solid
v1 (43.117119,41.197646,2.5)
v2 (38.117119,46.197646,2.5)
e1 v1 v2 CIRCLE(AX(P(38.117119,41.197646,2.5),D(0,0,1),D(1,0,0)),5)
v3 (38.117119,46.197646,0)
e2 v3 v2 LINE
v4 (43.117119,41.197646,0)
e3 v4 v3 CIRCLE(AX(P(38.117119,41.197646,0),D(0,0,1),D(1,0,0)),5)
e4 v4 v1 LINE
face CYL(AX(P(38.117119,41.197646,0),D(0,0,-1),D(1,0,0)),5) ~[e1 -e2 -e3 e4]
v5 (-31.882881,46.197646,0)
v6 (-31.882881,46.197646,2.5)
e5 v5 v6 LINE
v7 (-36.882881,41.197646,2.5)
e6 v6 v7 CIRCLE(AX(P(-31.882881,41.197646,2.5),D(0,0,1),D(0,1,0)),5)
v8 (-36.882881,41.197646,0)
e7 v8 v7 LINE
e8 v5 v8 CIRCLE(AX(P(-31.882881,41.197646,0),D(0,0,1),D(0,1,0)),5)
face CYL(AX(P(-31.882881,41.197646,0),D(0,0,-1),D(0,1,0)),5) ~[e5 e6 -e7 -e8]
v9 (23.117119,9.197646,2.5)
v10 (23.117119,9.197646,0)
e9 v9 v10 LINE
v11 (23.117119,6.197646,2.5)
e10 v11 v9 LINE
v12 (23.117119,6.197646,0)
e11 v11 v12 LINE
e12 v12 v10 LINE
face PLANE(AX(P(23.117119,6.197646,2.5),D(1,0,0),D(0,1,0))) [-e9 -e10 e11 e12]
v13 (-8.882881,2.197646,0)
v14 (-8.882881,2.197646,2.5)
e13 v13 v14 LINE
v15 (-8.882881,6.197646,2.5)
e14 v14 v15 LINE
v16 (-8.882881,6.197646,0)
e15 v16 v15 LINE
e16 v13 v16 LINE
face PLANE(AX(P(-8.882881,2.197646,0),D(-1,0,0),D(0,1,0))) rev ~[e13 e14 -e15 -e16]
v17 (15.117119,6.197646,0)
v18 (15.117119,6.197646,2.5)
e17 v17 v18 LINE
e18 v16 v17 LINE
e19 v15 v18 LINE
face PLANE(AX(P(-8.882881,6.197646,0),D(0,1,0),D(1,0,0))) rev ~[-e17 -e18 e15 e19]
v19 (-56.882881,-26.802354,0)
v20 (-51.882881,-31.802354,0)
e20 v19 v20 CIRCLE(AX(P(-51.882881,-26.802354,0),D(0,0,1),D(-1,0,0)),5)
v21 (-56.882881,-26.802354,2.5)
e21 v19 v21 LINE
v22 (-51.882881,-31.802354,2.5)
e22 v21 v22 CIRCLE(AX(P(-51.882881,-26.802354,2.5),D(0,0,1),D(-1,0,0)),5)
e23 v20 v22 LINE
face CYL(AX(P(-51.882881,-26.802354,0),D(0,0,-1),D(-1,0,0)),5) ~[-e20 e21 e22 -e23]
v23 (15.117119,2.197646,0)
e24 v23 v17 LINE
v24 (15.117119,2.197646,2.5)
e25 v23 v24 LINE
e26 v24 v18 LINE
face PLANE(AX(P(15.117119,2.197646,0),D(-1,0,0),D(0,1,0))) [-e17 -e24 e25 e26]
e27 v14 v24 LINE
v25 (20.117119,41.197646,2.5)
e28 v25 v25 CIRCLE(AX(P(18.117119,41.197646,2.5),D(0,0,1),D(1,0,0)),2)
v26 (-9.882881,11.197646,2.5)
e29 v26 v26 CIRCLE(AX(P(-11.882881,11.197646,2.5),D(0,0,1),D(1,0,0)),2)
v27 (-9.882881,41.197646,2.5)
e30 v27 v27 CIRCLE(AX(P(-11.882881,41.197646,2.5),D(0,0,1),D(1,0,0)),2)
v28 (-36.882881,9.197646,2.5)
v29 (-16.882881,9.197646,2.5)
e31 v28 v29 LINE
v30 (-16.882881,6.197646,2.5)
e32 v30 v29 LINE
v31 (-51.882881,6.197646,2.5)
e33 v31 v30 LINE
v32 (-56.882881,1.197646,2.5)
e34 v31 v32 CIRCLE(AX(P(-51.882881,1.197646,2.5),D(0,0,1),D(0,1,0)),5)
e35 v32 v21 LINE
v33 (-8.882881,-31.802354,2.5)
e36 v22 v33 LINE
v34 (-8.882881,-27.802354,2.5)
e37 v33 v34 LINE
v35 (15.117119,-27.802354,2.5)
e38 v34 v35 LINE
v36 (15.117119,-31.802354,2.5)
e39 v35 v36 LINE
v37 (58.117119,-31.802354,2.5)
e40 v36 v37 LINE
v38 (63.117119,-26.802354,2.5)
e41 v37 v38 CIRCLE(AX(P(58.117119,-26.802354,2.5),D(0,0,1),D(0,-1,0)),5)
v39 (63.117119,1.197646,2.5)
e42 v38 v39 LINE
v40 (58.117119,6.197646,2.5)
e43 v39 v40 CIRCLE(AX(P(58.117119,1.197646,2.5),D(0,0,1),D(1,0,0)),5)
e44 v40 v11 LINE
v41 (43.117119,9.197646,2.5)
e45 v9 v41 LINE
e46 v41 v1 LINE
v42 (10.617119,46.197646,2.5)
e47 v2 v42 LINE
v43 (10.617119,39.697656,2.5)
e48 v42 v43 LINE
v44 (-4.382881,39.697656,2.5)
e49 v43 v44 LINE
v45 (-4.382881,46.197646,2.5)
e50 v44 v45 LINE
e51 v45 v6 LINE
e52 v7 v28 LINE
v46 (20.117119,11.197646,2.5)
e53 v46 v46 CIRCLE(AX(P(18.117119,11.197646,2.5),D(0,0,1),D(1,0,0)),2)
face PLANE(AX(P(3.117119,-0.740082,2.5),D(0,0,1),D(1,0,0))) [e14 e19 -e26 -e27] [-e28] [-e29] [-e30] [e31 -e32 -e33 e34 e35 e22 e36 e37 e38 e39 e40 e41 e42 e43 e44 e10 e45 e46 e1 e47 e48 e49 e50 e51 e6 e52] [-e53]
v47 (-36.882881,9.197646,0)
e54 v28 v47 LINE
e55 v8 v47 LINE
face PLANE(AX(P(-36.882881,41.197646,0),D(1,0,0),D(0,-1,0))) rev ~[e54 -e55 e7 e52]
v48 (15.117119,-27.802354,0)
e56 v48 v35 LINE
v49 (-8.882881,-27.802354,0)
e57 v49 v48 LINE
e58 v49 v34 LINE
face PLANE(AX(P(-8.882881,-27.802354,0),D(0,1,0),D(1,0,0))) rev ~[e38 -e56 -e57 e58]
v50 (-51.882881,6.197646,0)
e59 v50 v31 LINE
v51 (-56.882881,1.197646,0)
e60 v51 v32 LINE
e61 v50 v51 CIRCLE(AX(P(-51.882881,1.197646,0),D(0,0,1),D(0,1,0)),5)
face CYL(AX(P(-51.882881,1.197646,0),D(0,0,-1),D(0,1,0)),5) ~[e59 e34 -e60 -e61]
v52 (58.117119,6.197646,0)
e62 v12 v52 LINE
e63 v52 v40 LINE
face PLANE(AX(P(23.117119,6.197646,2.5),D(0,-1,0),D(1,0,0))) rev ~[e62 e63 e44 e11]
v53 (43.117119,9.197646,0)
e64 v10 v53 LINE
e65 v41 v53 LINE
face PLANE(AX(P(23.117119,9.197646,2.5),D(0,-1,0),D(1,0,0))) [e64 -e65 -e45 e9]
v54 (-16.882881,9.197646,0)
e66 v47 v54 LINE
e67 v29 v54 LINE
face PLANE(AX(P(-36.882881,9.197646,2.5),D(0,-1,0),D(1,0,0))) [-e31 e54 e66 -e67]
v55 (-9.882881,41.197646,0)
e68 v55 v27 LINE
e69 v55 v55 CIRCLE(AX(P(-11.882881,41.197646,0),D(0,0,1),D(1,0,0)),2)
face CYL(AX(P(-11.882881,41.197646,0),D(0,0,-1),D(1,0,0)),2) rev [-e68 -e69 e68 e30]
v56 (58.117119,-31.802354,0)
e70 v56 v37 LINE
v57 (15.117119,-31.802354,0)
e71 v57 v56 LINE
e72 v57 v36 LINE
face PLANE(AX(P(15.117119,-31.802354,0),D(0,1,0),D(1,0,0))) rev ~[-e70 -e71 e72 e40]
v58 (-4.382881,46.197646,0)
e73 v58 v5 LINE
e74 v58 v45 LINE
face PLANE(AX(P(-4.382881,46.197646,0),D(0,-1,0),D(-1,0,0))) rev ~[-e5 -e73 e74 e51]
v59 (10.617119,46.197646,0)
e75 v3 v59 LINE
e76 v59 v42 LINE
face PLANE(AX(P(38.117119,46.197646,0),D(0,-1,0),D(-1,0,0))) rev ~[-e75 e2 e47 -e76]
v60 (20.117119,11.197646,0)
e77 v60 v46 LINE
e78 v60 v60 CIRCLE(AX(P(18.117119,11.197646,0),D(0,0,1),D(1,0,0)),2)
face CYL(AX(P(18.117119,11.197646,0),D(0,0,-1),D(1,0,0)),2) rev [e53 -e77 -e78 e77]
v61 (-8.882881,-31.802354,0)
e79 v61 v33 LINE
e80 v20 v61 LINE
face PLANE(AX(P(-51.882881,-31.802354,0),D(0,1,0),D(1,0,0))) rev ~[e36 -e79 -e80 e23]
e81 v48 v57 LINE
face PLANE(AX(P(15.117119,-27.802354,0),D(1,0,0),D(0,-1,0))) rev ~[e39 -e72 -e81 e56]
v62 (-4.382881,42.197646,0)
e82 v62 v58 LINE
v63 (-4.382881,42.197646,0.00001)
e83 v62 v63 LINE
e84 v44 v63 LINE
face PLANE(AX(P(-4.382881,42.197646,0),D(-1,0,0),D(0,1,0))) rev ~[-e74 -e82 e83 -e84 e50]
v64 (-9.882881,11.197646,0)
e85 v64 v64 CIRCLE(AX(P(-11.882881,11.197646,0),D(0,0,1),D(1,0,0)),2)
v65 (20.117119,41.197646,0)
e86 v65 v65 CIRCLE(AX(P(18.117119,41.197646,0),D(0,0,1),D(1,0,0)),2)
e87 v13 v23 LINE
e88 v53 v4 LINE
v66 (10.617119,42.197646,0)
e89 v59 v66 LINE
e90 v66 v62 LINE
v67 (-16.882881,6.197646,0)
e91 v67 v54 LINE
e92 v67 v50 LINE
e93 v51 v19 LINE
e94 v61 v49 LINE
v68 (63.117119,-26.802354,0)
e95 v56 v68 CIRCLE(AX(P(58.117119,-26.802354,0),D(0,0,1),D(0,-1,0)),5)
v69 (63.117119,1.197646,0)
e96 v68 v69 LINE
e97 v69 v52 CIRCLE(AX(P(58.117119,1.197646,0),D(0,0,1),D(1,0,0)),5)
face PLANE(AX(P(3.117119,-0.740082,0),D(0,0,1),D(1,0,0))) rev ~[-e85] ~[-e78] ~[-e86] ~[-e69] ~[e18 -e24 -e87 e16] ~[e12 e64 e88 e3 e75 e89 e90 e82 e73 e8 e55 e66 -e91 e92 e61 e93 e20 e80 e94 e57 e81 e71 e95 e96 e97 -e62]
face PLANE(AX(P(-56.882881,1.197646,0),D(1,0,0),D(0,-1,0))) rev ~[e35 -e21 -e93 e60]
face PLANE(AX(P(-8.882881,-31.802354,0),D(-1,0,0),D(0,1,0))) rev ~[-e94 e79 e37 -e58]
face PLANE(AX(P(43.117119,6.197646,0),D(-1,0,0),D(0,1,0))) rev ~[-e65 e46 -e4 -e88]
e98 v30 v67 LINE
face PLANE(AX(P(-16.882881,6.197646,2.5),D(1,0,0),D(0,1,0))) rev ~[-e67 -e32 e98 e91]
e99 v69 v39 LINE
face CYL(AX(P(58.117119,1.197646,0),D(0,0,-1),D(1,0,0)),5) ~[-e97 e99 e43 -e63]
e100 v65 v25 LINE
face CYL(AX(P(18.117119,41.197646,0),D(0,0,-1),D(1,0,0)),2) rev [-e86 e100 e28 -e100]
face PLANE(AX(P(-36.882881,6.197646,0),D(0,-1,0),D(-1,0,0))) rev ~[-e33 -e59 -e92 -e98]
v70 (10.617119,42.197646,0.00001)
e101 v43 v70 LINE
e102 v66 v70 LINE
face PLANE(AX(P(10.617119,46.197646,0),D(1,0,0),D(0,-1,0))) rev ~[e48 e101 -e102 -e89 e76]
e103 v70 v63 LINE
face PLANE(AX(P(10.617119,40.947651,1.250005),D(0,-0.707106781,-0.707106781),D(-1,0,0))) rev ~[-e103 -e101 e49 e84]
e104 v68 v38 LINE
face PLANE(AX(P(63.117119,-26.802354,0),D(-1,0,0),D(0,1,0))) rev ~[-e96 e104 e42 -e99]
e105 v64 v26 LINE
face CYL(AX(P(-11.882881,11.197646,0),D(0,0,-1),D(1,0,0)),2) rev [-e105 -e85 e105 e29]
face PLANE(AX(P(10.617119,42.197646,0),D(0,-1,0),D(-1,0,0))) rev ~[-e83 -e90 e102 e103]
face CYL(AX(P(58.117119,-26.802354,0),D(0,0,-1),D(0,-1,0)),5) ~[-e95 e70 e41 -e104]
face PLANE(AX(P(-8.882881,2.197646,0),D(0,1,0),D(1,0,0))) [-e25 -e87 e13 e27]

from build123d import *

# Parameters (mm, degrees)
F0_W     = 24
F0_H     = 4
F0_R     = 2
F1_DEPTH = 2.5
F2_W     = 20
F2_H     = 3
F3_DEPTH = 25
F4_SIZE  = 2.49999


# Not quite as in the source:
# - a fillet or chamfer is up to 0.001 mm smaller than in the source, because OpenCascade refuses the exact size


with BuildPart() as f1:
    # F0 (on Top) → F1 (new body)
    with BuildSketch(Plane.XY):
        with BuildLine():
            Line((-36.8828806926, 6.1976464093), (-51.8828806926, 6.1976464093))
            ThreePointArc((-51.8828806926, 6.1976464093), (-55.4184145986, 4.7331803152), (-56.8828806926, 1.1976464093))
            Line((-56.8828806926, 1.1976464093), (-56.8828806926, -26.8023535907))
            ThreePointArc((-56.8828806926, -26.8023535907), (-55.4184145986, -30.3378874967), (-51.8828806926, -31.8023535907))
            Line((-51.8828806926, -31.8023535907), (-8.8828806926, -31.8023535907))
            Line((-8.8828806926, -31.8023535907), (-8.8828806926, -27.8023535907))
            Line((-8.8828806926, -27.8023535907), (15.1171193074, -27.8023535907))
            Line((15.1171193074, -27.8023535907), (15.1171193074, -31.8023535907))
            Line((15.1171193074, -31.8023535907), (58.1171193074, -31.8023535907))
            ThreePointArc((58.1171193074, -31.8023535907), (61.6526532133, -30.3378874967), (63.1171193074, -26.8023535907))
            Line((63.1171193074, -26.8023535907), (63.1171193074, 1.1976464093))
            ThreePointArc((63.1171193074, 1.1976464093), (61.6526532133, 4.7331803152), (58.1171193074, 6.1976464093))
            Line((58.1171193074, 6.1976464093), (43.1171193074, 6.1976464093))
            Line((43.1171193074, 6.1976464093), (23.1171193074, 6.1976464093))
            Line((23.1171193074, 6.1976464093), (23.1171193074, 41.1976464093))
            ThreePointArc((23.1171193074, 41.1976464093), (21.6526532133, 44.7331803152), (18.1171193074, 46.1976464093))
            Line((18.1171193074, 46.1976464093), (10.6171193074, 46.1976464093))
            Line((10.6171193074, 46.1976464093), (10.6171193074, 42.1976464093))
            Line((10.6171193074, 42.1976464093), (-4.3828806926, 42.1976464093))
            Line((-4.3828806926, 42.1976464093), (-4.3828806926, 46.1976464093))
            Line((-4.3828806926, 46.1976464093), (-11.8828806926, 46.1976464093))
            ThreePointArc((-11.8828806926, 46.1976464093), (-15.4184145986, 44.7331803152), (-16.8828806926, 41.1976464093))
            Line((-16.8828806926, 41.1976464093), (-16.8828806926, 6.1976464093))
            Line((-16.8828806926, 6.1976464093), (-36.8828806926, 6.1976464093))
        make_face()
        with Locations((3.1171193074, 4.1976464093)):
            Rectangle(F0_W, F0_H, mode=Mode.SUBTRACT)
        with Locations((-11.8828806926, 11.1976464093)):
            Circle(F0_R, mode=Mode.SUBTRACT)
        with Locations((-11.8828806926, 41.1976464093)):
            Circle(F0_R, mode=Mode.SUBTRACT)
        with Locations((18.1171193074, 11.1976464093)):
            Circle(F0_R, mode=Mode.SUBTRACT)
        with Locations((18.1171193074, 41.1976464093)):
            Circle(F0_R, mode=Mode.SUBTRACT)
        with BuildLine():
            Line((-36.8828806926, 41.1976464093), (-36.8828806926, 6.1976464093))
            Line((-36.8828806926, 6.1976464093), (-16.8828806926, 6.1976464093))
            Line((-16.8828806926, 6.1976464093), (-16.8828806926, 41.1976464093))
            ThreePointArc((-16.8828806926, 41.1976464093), (-15.4184145986, 44.7331803152), (-11.8828806926, 46.1976464093))
            Line((-11.8828806926, 46.1976464093), (-16.8828806926, 46.1976464093))
            Line((-16.8828806926, 46.1976464093), (-31.8828806926, 46.1976464093))
            ThreePointArc((-31.8828806926, 46.1976464093), (-35.4184145986, 44.7331803152), (-36.8828806926, 41.1976464093))
        make_face()
        with BuildLine():
            Line((23.1171193074, 46.1976464093), (18.1171193074, 46.1976464093))
            ThreePointArc((18.1171193074, 46.1976464093), (21.6526532133, 44.7331803152), (23.1171193074, 41.1976464093))
            Line((23.1171193074, 41.1976464093), (23.1171193074, 6.1976464093))
            Line((23.1171193074, 6.1976464093), (43.1171193074, 6.1976464093))
            Line((43.1171193074, 6.1976464093), (43.1171193074, 41.1976464093))
            ThreePointArc((43.1171193074, 41.1976464093), (41.6526532133, 44.7331803152), (38.1171193074, 46.1976464093))
            Line((38.1171193074, 46.1976464093), (23.1171193074, 46.1976464093))
        make_face()
    extrude(amount=F1_DEPTH)

    # F2 (on face) → F3 (cut)
    with BuildSketch(Plane.XY.offset(2.5)):
        with Locations((-26.8828806926, 7.6976464093)):
            Rectangle(F2_W, F2_H)
        with Locations((33.1171193074, 7.6976464093)):
            Rectangle(F2_W, F2_H)
    extrude(amount=-F3_DEPTH, mode=Mode.SUBTRACT)

    # F4 (size 2.5 in the source; OpenCascade refuses exactly that, so slightly less here)
    f4_edges = [f1.edges().sort_by_distance(p)[0] for p in [
        (3.117119, 42.197646, 2.5),
    ]]
    chamfer(f4_edges, length=F4_SIZE)


solid = f1.part
